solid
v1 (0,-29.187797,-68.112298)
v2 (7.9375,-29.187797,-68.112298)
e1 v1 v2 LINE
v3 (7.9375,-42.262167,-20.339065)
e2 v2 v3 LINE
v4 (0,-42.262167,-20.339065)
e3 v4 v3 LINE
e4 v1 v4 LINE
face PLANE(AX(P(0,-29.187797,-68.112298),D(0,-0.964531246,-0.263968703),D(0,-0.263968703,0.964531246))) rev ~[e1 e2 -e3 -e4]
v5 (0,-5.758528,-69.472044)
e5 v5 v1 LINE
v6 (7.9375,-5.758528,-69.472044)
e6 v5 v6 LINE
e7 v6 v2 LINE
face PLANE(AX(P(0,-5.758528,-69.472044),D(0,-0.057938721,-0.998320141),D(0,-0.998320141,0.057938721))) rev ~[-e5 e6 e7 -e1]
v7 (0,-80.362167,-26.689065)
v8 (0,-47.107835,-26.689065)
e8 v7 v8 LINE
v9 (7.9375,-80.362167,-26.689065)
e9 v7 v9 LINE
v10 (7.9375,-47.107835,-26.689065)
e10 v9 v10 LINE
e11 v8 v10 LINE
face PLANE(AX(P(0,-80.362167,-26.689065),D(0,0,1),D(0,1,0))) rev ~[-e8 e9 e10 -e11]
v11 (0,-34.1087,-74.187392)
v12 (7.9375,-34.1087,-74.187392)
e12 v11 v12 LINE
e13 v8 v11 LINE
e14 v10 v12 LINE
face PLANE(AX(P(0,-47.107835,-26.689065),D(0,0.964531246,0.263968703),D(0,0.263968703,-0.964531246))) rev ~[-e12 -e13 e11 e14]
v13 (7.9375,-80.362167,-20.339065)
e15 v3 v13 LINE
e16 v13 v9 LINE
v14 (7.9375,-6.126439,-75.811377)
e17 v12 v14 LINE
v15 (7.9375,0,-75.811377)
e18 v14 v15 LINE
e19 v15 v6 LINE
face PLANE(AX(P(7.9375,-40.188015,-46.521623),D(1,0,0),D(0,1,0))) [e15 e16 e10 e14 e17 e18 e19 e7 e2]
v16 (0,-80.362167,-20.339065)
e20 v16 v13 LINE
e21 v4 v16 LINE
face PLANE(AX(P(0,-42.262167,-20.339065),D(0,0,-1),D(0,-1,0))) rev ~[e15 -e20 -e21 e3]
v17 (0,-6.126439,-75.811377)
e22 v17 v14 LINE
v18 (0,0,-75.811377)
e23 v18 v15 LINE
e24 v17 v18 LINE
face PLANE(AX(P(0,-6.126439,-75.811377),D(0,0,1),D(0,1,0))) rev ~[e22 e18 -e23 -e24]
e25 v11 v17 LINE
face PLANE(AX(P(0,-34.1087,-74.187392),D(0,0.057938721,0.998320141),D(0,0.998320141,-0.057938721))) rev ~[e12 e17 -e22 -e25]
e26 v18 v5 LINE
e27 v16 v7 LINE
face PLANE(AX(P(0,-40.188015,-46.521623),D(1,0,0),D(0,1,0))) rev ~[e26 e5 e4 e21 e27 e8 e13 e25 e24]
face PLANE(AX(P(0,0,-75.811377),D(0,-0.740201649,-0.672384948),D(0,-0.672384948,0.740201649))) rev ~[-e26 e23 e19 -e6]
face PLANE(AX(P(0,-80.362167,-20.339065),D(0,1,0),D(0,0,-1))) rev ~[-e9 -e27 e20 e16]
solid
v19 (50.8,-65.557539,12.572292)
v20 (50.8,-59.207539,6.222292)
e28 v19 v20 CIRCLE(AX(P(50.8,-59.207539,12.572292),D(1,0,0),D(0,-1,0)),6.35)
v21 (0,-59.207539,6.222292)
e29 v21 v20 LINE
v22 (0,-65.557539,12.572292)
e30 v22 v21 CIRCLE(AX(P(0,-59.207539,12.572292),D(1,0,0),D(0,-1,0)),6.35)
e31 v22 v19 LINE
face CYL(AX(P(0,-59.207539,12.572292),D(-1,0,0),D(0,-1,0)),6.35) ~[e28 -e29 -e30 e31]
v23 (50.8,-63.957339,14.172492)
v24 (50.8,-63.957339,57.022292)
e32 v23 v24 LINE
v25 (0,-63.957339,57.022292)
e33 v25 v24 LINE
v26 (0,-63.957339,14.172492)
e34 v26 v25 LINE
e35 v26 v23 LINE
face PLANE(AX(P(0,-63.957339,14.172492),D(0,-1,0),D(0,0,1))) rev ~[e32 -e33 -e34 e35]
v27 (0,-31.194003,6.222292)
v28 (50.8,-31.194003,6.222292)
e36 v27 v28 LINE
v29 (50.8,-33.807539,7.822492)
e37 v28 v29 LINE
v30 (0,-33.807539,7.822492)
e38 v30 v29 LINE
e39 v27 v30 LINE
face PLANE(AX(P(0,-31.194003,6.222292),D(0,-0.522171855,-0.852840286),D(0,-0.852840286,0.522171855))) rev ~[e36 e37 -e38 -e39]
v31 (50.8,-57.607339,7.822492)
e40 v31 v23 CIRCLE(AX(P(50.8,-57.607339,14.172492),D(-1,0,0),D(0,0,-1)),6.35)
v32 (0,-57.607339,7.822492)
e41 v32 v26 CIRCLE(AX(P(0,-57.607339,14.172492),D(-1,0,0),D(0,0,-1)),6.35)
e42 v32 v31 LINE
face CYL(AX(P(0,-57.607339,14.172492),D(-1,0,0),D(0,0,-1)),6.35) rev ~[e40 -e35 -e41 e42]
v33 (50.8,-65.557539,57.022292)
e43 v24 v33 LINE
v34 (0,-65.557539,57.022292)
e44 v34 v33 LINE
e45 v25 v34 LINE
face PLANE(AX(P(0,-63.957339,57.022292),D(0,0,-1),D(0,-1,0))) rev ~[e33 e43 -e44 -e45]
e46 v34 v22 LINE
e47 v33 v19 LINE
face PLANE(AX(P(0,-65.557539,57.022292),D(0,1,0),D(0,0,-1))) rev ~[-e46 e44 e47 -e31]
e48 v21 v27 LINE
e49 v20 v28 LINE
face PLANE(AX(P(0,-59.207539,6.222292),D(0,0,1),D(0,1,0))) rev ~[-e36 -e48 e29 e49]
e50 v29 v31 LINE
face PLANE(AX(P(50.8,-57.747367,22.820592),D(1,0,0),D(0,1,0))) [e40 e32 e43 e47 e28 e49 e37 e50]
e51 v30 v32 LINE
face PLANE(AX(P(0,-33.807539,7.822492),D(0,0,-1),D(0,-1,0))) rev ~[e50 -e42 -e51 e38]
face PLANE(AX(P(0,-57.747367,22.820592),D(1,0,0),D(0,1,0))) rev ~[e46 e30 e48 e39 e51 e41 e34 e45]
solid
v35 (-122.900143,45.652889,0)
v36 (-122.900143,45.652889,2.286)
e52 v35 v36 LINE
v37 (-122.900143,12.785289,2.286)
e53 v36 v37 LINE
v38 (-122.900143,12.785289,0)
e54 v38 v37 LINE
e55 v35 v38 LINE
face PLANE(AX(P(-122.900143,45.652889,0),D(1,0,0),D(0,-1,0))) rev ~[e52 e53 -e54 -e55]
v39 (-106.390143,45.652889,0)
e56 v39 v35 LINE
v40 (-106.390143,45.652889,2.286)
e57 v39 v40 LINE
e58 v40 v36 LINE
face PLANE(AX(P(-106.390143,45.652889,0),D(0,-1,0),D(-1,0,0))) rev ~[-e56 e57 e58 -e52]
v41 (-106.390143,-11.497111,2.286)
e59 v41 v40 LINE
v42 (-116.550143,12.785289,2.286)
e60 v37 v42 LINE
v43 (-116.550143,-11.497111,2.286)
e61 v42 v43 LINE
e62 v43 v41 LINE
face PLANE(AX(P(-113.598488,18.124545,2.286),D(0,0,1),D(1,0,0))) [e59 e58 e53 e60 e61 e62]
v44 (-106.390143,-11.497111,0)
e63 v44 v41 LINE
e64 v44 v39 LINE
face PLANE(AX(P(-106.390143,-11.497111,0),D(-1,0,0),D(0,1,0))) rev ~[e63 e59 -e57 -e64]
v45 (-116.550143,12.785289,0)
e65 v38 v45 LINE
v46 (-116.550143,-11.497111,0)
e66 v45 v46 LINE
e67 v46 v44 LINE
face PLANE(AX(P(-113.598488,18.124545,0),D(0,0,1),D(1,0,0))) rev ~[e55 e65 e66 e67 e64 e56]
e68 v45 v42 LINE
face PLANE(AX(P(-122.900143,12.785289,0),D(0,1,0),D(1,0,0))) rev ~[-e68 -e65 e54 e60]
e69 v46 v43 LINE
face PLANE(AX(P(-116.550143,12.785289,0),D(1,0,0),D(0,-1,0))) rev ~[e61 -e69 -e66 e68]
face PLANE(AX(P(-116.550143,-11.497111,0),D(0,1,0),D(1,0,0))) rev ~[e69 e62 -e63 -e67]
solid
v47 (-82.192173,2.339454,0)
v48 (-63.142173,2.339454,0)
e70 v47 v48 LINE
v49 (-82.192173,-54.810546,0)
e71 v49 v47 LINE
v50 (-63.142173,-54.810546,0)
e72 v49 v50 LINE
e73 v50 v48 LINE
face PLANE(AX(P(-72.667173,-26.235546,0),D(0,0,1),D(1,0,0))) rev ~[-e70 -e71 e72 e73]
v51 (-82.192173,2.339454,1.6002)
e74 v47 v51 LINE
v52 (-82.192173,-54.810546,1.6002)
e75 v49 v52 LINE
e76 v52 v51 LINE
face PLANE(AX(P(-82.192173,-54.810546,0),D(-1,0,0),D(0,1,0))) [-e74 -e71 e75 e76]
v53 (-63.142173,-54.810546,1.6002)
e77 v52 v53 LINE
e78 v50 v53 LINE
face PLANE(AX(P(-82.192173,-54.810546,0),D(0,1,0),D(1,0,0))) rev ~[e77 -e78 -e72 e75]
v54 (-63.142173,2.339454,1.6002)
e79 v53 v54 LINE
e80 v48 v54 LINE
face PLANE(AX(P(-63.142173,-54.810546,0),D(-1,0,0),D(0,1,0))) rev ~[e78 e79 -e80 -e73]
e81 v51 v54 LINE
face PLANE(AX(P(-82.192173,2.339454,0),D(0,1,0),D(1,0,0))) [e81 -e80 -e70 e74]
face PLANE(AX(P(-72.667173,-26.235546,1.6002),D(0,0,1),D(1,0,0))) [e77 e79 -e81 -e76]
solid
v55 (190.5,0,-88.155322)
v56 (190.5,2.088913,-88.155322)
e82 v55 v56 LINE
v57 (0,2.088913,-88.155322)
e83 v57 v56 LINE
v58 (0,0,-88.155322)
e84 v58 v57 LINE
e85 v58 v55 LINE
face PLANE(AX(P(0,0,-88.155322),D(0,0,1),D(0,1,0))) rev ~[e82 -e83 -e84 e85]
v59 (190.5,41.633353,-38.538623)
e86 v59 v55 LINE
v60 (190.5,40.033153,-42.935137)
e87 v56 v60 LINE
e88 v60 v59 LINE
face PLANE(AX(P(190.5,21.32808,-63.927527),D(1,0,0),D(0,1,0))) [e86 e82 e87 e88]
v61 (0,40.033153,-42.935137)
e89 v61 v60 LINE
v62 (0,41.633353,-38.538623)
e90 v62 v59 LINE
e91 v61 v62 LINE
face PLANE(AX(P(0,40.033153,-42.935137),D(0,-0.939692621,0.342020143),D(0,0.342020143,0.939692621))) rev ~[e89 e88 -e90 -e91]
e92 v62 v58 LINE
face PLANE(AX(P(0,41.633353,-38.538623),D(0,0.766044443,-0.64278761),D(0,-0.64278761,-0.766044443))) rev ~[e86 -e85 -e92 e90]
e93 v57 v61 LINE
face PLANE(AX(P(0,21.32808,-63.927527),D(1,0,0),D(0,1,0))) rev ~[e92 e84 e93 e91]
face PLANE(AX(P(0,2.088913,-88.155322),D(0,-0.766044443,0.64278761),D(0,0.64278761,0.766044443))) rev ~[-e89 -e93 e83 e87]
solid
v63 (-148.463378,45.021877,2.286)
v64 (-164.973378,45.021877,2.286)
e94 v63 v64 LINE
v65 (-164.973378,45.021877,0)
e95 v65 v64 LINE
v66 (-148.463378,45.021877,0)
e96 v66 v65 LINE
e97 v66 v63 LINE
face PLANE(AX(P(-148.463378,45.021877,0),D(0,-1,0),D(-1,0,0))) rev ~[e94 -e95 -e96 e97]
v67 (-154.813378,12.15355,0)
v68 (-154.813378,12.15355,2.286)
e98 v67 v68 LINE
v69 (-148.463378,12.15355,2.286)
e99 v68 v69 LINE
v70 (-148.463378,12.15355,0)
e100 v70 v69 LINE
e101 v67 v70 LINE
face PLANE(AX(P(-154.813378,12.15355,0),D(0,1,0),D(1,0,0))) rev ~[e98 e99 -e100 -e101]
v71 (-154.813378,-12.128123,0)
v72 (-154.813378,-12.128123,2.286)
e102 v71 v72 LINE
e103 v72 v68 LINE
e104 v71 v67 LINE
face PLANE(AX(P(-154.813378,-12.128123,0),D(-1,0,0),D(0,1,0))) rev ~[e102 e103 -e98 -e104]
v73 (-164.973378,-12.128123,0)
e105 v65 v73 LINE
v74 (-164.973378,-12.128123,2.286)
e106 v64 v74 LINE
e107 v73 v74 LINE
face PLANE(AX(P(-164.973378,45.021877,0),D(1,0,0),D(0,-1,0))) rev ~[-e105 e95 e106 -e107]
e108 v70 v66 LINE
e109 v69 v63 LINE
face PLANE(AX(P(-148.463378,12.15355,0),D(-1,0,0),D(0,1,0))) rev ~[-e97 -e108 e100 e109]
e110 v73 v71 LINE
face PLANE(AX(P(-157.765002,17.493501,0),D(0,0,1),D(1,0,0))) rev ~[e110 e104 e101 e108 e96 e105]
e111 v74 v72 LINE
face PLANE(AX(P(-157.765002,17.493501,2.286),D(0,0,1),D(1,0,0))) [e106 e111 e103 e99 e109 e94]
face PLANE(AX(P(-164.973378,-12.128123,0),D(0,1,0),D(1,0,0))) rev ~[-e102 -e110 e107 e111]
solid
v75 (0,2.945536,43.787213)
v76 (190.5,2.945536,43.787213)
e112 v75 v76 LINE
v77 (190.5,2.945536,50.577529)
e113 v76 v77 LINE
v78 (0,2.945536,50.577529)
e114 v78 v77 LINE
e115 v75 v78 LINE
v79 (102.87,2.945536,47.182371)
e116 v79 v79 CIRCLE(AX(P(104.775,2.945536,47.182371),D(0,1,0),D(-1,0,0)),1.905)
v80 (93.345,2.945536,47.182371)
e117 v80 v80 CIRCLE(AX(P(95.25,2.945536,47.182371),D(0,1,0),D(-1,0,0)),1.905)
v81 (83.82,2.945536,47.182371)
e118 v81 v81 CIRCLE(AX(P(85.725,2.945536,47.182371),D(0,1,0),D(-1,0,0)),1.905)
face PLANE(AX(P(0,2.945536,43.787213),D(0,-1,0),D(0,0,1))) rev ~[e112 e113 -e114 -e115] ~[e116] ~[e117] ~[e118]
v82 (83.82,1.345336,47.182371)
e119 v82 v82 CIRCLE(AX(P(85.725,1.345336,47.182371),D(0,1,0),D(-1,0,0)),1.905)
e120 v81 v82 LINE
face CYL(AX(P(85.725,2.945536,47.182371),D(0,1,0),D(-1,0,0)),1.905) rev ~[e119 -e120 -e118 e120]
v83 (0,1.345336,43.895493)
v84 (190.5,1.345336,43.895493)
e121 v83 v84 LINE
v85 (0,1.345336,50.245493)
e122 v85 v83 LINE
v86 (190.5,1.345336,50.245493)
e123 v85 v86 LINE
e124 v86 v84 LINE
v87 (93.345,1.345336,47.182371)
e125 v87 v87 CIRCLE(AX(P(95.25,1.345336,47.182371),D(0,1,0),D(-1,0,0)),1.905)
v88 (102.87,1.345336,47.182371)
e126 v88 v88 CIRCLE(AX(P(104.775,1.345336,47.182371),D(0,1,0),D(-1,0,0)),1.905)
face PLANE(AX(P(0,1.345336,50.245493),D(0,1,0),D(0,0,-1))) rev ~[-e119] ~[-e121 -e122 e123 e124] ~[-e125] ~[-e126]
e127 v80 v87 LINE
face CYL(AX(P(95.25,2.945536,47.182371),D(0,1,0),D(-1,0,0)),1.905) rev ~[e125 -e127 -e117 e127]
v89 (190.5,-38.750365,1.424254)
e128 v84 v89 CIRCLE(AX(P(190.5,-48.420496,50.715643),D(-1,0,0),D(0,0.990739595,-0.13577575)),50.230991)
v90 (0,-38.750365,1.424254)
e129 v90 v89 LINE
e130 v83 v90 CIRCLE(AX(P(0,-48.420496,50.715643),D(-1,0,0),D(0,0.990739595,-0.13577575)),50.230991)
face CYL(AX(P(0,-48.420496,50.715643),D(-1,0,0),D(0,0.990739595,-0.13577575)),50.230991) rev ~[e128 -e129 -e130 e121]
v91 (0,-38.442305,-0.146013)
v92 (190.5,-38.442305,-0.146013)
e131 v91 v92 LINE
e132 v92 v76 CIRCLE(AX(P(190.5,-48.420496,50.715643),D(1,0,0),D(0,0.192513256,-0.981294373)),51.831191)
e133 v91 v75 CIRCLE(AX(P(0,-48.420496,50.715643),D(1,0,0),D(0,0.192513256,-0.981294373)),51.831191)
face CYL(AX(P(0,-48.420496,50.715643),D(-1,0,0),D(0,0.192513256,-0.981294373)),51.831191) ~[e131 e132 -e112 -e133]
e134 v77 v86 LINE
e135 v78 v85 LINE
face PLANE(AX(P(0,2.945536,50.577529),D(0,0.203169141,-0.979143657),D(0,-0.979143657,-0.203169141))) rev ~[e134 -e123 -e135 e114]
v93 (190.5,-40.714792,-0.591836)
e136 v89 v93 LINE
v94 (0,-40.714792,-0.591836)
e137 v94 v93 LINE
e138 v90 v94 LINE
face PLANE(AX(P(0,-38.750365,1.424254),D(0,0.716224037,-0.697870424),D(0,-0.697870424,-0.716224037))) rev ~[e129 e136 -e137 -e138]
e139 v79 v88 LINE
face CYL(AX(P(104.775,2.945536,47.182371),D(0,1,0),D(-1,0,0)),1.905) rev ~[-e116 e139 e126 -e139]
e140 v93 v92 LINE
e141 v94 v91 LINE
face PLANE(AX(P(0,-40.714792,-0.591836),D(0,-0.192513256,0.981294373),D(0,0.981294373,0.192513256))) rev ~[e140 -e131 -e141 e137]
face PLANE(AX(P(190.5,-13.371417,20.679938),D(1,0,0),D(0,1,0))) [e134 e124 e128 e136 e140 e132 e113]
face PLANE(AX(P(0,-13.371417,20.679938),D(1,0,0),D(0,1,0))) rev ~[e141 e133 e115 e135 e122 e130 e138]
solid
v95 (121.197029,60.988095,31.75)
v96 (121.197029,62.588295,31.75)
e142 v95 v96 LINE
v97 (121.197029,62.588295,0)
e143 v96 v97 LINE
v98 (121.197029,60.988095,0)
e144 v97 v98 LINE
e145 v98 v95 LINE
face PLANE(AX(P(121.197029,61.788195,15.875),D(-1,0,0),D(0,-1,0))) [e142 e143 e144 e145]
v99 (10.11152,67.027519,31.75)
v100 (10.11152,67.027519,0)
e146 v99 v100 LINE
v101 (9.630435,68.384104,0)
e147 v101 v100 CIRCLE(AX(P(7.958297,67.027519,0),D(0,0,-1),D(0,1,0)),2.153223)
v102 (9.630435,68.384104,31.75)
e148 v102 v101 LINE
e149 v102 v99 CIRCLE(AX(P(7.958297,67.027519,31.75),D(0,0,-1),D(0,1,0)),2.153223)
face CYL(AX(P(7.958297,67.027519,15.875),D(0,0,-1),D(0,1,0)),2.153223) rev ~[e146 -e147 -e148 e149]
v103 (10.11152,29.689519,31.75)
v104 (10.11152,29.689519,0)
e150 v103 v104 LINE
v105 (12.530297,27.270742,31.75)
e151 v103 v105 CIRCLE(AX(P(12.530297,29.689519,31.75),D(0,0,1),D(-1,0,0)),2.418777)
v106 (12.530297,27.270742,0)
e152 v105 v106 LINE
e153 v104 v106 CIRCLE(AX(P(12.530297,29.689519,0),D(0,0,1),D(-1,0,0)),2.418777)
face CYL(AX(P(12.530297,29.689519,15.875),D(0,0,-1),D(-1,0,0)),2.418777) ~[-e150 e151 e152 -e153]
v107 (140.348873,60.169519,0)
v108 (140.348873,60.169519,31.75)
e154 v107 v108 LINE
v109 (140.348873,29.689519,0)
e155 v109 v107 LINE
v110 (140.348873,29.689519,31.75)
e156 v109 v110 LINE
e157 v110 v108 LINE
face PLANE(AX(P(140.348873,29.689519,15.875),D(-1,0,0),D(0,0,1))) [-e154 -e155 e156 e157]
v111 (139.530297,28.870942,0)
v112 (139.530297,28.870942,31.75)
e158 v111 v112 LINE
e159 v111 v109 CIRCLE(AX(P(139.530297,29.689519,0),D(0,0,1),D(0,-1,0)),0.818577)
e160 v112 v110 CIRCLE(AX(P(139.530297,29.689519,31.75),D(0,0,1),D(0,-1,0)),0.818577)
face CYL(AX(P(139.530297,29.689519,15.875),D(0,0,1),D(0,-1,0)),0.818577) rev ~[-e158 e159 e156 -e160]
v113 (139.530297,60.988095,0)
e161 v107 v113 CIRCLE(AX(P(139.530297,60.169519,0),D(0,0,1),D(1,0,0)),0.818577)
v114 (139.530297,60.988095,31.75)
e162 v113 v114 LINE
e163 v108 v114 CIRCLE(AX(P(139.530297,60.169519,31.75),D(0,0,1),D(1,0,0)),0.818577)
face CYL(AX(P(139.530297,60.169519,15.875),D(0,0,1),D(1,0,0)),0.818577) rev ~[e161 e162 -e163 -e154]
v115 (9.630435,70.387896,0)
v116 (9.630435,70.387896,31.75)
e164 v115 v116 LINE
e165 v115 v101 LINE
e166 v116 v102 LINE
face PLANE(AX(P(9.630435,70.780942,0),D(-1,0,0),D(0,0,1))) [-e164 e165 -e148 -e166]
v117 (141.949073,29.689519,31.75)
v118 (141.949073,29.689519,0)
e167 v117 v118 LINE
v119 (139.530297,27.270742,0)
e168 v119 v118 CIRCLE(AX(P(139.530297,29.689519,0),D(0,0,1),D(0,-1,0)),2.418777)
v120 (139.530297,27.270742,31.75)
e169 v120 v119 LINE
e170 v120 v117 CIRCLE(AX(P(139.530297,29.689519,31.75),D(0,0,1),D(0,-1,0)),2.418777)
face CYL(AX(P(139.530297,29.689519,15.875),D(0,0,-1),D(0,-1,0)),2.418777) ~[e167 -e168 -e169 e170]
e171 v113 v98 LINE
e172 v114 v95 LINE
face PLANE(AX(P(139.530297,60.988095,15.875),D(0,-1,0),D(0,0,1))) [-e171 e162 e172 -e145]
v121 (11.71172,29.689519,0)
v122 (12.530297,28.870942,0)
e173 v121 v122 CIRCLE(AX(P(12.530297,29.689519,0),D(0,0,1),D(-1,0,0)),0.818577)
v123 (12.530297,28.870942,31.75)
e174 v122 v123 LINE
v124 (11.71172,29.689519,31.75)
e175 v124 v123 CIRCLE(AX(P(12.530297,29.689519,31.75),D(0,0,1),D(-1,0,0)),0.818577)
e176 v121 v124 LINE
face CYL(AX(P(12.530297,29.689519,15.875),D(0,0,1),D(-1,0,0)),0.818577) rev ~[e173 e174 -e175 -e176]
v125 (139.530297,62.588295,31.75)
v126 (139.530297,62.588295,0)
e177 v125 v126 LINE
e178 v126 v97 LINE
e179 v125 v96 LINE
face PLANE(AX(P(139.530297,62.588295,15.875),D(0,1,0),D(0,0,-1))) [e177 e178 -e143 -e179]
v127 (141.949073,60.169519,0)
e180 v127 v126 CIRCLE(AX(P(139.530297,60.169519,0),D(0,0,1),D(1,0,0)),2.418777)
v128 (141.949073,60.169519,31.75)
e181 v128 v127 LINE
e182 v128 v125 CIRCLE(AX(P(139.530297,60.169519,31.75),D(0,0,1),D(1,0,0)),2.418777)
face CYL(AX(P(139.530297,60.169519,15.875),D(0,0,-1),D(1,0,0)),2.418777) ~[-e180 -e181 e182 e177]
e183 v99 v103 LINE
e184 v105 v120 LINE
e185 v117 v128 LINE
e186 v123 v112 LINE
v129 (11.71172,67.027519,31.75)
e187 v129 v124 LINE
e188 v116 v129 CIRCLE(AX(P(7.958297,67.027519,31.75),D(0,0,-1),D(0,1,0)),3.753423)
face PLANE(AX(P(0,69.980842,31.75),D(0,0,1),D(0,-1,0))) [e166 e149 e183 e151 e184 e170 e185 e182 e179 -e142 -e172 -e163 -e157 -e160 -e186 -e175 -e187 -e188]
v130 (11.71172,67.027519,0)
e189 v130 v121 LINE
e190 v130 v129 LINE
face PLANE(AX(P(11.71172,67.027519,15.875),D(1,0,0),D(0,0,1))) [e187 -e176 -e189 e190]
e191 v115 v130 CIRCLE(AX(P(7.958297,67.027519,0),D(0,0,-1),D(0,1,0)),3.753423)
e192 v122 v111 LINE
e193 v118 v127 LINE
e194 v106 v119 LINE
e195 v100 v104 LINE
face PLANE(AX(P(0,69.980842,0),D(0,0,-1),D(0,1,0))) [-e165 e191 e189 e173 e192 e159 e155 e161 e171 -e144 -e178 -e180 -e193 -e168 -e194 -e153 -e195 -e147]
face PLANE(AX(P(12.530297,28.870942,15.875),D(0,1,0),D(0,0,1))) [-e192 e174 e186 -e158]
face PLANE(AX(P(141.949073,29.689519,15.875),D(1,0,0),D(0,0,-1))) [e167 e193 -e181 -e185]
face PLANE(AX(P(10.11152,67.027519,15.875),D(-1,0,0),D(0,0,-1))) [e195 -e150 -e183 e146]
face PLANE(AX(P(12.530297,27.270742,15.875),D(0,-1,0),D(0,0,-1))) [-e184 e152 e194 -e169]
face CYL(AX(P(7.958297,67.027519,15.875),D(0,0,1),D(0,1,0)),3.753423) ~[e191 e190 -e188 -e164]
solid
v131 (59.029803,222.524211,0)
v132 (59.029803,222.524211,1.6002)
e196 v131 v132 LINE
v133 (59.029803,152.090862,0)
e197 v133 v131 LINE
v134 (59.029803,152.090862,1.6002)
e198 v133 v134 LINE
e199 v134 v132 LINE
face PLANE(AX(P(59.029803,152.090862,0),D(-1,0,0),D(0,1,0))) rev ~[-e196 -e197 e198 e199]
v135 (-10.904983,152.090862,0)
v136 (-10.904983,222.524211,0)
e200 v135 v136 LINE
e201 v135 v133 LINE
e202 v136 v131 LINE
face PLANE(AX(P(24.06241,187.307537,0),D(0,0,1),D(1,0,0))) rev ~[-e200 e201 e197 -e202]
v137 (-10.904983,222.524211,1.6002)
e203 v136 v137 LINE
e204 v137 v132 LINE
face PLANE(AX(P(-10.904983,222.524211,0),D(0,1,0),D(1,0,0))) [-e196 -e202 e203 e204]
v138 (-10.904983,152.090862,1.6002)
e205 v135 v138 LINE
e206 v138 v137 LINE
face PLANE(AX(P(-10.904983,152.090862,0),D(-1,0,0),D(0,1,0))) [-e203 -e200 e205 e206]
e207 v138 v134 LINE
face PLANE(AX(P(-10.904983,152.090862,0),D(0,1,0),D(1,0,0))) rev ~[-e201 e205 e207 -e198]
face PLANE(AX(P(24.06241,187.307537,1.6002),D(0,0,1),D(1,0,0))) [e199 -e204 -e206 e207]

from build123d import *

# Parameters (mm, degrees)
F1_DEPTH  = 190.5
F2_W      = 19.05
F2_H      = 57.15
F3_DEPTH  = 1.6002
F5_DEPTH  = 190.5
F7_DEPTH  = 50.8
F8_W      = 69.9347853661
F8_H      = 70.4333484173
F21_DEPTH = 1.6002
F22_DEPTH = 7.9375
F10_R     = 1.905
F11_DEPTH = 83.3087024486
F13_DEPTH = 2.286
F15_DEPTH = 2.286
F16_W     = 1.6002
F16_H     = 31.75
F19_W     = 9.6304351464
F19_H     = 31.75
F20_DEPTH = 25.4


# Not quite as in the source:
# - a feature names something its author has since deleted; it is built from what else it names


with BuildPart() as f1:
    # F0 (on Right) → F1 (new body)
    with BuildSketch(Plane.YZ):
        with BuildLine():
            Line((2.9455358163, 50.5775293171), (1.3453358163, 50.2454929949))
            Line((1.3453358163, 50.2454929949), (1.3453358163, 43.8954929949))
            ThreePointArc((1.3453358163, 43.8954929949), (-11.8950260011, 16.2331476976), (-38.7503645073, 1.4242543521))
            Line((-38.7503645073, 1.4242543521), (-40.7147916438, -0.59183615))
            Line((-40.7147916438, -0.59183615), (-38.4423047946, -0.1460129033))
            ThreePointArc((-38.4423047946, -0.1460129033), (-10.6937083452, 15.1746548691), (2.9455358163, 43.7872130318))
            Line((2.9455358163, 43.7872130318), (2.9455358163, 50.5775293171))
        make_face()
    extrude(amount=F1_DEPTH)

    # F10 (on face) → F11 (cut, through all)
    with BuildSketch(Plane(origin=(0, 2.9455358163, 0), x_dir=(-1, 0, 0), z_dir=(0, 1, 0))):
        with Locations((-95.25, 47.1823711745)):
            Circle(F10_R)
        with Locations((-85.725, 47.1823711745)):
            Circle(F10_R)
        with Locations((-104.775, 47.1823711745)):
            Circle(F10_R)
    extrude(amount=-F11_DEPTH, mode=Mode.SUBTRACT)


with BuildPart() as f3:
    # F2 (on Top) → F3 (new body)
    with BuildSketch(Plane.XY):
        with Locations((-72.6671729922, -26.2355463386)):
            Rectangle(F2_W, F2_H)
    extrude(amount=F3_DEPTH)


with BuildPart() as f5:
    # F4 (on Right) → F5 (new body)
    with BuildSketch(Plane.YZ):
        Polygon((40.0331534794, -42.9351368162), (41.6333534794, -38.5386234495), (0, -88.1553220304), (2.0889127444, -88.1553220304), align=None)
    extrude(amount=F5_DEPTH)


with BuildPart() as f7:
    # F6 (on Right) → F7 (new body)
    with BuildSketch(Plane.YZ):
        with BuildLine():
            Line((-63.957339463, 57.0222916961), (-65.557539463, 57.0222916961))
            Line((-65.557539463, 57.0222916961), (-65.557539463, 12.5722916961))
            ThreePointArc((-65.557539463, 12.5722916961), (-63.6976675236, 8.0821636355), (-59.207539463, 6.2222916961))
            Line((-59.207539463, 6.2222916961), (-33.807539463, 6.2222916961))
            Line((-33.807539463, 6.2222916961), (-31.1940032989, 6.2222916961))
            Line((-31.1940032989, 6.2222916961), (-33.807539463, 7.8224916961))
            Line((-33.807539463, 7.8224916961), (-57.607339463, 7.8224916961))
            ThreePointArc((-57.607339463, 7.8224916961), (-62.0974675236, 9.6823636355), (-63.957339463, 14.1724916961))
            Line((-63.957339463, 14.1724916961), (-63.957339463, 57.0222916961))
        make_face()
    extrude(amount=F7_DEPTH)


with BuildPart() as f21:
    # F8 (on Top) → F21 (new body)
    with BuildSketch(Plane.XY):
        with Locations((24.062409997, 187.307536602)):
            Rectangle(F8_W, F8_H)
    extrude(amount=F21_DEPTH)


with BuildPart() as f22:
    # F9 (on Right) → F22 (new body)
    with BuildSketch(Plane.YZ):
        Polygon((-42.2621666323, -20.3390651836), (-80.3621666323, -20.3390651836), (-80.3621666323, -26.6890651836), (-47.1078351951, -26.6890651836), (-34.1087002788, -74.1873922208), (-6.1264390171, -75.8113767203), (0, -75.8113767203), (-5.7585281372, -69.4720438228), (-29.1877967625, -68.1122977778), align=None)
    extrude(amount=F22_DEPTH)


with BuildPart() as f13:
    # F12 (on Top) → F13 (new body)
    with BuildSketch(Plane.XY):
        Polygon((-164.9733781815, 45.0218769178), (-164.9733781815, -12.1281230822), (-154.8133781815, -12.1281230822), (-154.8133781815, 12.1535500512), (-148.4633781815, 12.1535500512), (-148.4633781815, 45.0218769178), align=None)
    extrude(amount=F13_DEPTH)


with BuildPart() as f15:
    # F14 (on Top) → F15 (new body)
    with BuildSketch(Plane.XY):
        Polygon((-106.3901432657, -11.4971105634), (-106.3901432657, 45.6528894366), (-122.9001432657, 45.6528894366), (-122.9001432657, 12.7852894366), (-116.5501432657, 12.7852894366), (-116.5501432657, -11.4971105634), align=None)
    extrude(amount=F15_DEPTH)


with BuildPart() as f18:
    # F18: sweep along a path in F17
    with BuildLine(Plane.XY) as f18_path:
        Line((0, 69.313518703), (7.9582965779, 69.313518703))
        ThreePointArc((7.9582965779, 69.313518703), (9.5747426797, 68.6439648048), (10.2442965779, 67.027518703))
        Line((10.2442965779, 67.027518703), (10.2442965779, 29.689518703))
        ThreePointArc((10.2442965779, 29.689518703), (10.9138504761, 28.0730726012), (12.5302965779, 27.403518703))
        Line((12.5302965779, 27.403518703), (139.5302965779, 27.403518703))
        ThreePointArc((139.5302965779, 27.403518703), (141.1467426797, 28.0730726012), (141.8162965779, 29.689518703))
        Line((141.8162965779, 29.689518703), (141.8162965779, 60.169518703))
        ThreePointArc((141.8162965779, 60.169518703), (141.1467426797, 61.7859648048), (139.5302965779, 62.455518703))
        Line((139.5302965779, 62.455518703), (121.1970292659, 62.455518703))
    # F16 (on Right) → F18 (sweep)
    with BuildSketch(Plane.YZ):
        with Locations((69.9808419062, 15.875)):
            Rectangle(F16_W, F16_H)
    sweep(path=f18_path.line)

    # F19 (on face) → F20 (cut)
    with BuildSketch(Plane(origin=(0, 70.7809419062, 0), x_dir=(-1, 0, 0), z_dir=(0, 1, 0))):
        with Locations((-4.8152175732, 15.875)):
            Rectangle(F19_W, F19_H)
    extrude(amount=-F20_DEPTH, mode=Mode.SUBTRACT)


solid = Compound([f1.part, f3.part, f5.part, f7.part, f21.part, f22.part, f13.part, f15.part, f18.part])
